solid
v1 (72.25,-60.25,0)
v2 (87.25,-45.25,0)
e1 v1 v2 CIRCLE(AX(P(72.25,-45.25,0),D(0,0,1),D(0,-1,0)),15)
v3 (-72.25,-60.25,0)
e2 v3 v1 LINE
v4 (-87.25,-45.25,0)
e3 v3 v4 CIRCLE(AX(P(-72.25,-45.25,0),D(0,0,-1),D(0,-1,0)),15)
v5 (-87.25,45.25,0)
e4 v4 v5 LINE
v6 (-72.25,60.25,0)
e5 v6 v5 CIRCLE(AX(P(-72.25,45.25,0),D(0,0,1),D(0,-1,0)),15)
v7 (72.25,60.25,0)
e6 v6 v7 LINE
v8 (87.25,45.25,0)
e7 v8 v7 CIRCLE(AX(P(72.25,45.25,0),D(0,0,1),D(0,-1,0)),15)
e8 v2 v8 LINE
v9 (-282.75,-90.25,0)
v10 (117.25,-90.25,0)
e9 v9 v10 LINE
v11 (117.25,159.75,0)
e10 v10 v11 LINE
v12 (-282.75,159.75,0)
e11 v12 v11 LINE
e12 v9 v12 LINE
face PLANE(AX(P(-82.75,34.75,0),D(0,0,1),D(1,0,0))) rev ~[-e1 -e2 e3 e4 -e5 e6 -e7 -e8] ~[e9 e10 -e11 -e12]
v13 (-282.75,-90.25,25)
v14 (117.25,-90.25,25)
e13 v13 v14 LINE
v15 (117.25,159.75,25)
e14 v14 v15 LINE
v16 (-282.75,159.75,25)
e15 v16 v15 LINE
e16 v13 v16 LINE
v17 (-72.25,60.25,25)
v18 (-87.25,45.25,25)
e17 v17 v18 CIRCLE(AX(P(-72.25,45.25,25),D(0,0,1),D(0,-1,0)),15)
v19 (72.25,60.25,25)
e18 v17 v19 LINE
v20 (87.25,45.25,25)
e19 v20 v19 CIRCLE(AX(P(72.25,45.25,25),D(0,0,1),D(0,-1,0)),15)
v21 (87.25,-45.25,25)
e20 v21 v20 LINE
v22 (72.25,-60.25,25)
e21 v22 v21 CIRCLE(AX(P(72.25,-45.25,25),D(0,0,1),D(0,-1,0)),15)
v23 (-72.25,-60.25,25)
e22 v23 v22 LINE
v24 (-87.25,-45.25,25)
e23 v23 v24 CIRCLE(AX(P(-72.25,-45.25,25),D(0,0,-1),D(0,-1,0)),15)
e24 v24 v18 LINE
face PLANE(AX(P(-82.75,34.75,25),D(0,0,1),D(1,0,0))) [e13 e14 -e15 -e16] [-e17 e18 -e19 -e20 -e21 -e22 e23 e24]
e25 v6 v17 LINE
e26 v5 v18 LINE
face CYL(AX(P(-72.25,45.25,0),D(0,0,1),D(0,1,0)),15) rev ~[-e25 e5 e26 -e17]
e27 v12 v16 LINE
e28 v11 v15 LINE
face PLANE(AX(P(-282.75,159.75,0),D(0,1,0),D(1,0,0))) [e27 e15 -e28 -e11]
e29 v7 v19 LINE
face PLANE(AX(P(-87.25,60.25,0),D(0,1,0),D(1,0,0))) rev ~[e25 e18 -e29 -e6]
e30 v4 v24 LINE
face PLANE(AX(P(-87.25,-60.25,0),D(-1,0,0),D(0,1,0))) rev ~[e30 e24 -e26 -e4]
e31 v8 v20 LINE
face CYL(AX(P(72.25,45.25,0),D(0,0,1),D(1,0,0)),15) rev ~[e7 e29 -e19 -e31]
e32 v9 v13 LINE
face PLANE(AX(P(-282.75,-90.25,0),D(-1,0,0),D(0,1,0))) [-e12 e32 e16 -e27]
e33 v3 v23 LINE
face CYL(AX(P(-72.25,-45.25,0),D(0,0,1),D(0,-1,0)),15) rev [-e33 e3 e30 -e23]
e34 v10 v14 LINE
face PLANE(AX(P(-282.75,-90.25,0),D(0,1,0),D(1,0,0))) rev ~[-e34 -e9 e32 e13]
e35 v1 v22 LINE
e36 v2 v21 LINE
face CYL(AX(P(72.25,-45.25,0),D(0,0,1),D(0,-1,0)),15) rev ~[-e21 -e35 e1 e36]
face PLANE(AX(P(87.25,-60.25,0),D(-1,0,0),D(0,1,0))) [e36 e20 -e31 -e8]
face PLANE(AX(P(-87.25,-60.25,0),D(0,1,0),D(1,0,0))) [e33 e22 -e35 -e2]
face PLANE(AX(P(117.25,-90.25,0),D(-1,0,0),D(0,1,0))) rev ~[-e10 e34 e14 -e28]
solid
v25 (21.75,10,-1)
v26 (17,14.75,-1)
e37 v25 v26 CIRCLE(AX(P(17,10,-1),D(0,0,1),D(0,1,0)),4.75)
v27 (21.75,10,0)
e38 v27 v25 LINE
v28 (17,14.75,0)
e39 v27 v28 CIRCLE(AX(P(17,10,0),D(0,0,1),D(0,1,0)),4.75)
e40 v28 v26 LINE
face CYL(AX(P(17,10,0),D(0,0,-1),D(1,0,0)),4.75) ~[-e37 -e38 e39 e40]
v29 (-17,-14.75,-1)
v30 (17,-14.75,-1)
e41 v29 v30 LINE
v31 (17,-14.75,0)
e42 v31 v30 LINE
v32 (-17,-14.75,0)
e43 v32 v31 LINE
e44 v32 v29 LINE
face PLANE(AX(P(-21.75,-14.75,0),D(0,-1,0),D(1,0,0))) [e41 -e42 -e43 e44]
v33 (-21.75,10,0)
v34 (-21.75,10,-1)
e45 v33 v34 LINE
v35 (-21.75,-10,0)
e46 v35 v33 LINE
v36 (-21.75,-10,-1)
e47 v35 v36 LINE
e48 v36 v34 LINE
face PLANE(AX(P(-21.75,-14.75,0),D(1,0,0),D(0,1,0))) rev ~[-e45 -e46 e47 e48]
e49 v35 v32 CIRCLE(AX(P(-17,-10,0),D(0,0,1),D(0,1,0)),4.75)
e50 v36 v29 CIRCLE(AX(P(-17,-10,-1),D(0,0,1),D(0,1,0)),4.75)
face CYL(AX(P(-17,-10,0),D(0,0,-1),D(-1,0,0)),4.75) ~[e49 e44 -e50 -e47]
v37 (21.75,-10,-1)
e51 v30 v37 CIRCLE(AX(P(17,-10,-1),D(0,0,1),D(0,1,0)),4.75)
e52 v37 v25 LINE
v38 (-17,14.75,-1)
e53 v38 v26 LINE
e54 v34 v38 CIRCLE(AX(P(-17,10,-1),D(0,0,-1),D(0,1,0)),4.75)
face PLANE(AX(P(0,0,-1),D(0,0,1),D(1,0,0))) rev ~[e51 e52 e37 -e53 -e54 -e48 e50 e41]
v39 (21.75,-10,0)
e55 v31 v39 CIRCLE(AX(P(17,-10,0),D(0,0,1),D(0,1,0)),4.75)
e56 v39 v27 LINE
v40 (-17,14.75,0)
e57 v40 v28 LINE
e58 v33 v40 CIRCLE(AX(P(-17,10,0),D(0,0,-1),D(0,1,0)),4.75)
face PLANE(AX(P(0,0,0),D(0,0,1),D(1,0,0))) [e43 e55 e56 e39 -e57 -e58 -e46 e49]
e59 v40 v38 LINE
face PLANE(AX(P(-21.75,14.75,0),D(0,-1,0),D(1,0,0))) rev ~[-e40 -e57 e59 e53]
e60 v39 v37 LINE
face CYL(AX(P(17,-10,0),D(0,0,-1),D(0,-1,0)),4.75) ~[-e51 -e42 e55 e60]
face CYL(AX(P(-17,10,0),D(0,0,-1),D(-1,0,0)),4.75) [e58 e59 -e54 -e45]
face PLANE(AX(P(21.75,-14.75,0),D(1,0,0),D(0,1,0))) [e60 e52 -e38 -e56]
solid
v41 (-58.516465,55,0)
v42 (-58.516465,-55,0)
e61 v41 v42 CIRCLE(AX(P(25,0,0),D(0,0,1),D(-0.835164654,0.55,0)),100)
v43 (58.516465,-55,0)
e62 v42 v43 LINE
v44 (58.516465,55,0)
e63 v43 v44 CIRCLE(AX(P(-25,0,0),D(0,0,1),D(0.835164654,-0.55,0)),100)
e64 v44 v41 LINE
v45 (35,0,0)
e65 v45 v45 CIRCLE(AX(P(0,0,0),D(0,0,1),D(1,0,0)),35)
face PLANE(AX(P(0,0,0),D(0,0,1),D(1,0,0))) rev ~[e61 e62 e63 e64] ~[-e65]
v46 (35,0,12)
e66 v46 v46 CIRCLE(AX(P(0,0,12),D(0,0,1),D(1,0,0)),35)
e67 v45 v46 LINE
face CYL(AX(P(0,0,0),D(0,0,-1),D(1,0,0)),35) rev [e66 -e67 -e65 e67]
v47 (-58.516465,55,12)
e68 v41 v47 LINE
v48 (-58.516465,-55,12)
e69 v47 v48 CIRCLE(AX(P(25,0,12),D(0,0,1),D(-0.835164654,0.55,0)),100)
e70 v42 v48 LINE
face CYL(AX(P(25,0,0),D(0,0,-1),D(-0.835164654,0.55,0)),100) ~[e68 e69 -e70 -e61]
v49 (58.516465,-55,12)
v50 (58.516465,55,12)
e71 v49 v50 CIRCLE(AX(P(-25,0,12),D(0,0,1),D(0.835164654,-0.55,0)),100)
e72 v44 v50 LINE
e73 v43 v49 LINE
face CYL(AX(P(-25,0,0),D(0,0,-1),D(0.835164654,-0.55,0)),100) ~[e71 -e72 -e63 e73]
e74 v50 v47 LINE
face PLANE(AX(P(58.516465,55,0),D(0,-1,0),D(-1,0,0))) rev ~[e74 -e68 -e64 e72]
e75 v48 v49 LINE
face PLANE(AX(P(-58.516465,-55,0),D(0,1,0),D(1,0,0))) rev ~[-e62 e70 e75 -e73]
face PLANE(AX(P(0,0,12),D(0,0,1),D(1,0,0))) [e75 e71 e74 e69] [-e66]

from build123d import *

# Parameters (mm, degrees)
F1_W     = 400
F1_H     = 250
F1_W_2   = 174.5
F1_H_2   = 120.5
F2_DEPTH = 25
F1_R     = 35
F3_DEPTH = 12
F1_W_3   = 43.5
F1_H_3   = 29.5
F4_DEPTH = 1
F5_R     = 4.75
F6_R     = 15


# Not quite as in the source:
# - a feature names something its author has since deleted; it is built from what else it names


with BuildPart() as f2:
    # F1 (on Top) → F2 (new body)
    with BuildSketch(Plane.XY):
        with Locations((-82.75, 34.75)):
            Rectangle(F1_W, F1_H)
        Rectangle(F1_W_2, F1_H_2, mode=Mode.SUBTRACT)
    extrude(amount=F2_DEPTH)

    # F6
    f6_edges = [f2.edges().sort_by_distance(p)[0] for p in [
        (87.25, -60.25, 12.5),
        (87.25, 60.25, 12.5),
        (-87.25, 60.25, 12.5),
        (-87.25, -60.25, 12.5),
    ]]
    fillet(f6_edges, radius=F6_R)


with BuildPart() as f3:
    # F1 (on Top) → F3 (new body)
    with BuildSketch(Plane.XY):
        with BuildLine():
            Line((58.5164654425, 55), (-58.5164654425, 55))
            ThreePointArc((-58.5164654425, 55), (-75, 0), (-58.5164654425, -55))
            Line((-58.5164654425, -55), (58.5164654425, -55))
            ThreePointArc((58.5164654425, -55), (75, 0), (58.5164654425, 55))
        make_face()
        Circle(F1_R, mode=Mode.SUBTRACT)
    extrude(amount=F3_DEPTH)


with BuildPart() as f4:
    # F1 (on Top) → F4 (new body)
    with BuildSketch(Plane.XY):
        Rectangle(F1_W_3, F1_H_3)
    extrude(amount=-F4_DEPTH)

    # F5
    f5_edges = [f4.edges().sort_by_distance(p)[0] for p in [
        (21.75, -14.75, -0.5),
        (21.75, 14.75, -0.5),
        (-21.75, -14.75, -0.5),
        (-21.75, 14.75, -0.5),
    ]]
    fillet(f5_edges, radius=F5_R)


solid = Compound([f2.part, f3.part, f4.part])
